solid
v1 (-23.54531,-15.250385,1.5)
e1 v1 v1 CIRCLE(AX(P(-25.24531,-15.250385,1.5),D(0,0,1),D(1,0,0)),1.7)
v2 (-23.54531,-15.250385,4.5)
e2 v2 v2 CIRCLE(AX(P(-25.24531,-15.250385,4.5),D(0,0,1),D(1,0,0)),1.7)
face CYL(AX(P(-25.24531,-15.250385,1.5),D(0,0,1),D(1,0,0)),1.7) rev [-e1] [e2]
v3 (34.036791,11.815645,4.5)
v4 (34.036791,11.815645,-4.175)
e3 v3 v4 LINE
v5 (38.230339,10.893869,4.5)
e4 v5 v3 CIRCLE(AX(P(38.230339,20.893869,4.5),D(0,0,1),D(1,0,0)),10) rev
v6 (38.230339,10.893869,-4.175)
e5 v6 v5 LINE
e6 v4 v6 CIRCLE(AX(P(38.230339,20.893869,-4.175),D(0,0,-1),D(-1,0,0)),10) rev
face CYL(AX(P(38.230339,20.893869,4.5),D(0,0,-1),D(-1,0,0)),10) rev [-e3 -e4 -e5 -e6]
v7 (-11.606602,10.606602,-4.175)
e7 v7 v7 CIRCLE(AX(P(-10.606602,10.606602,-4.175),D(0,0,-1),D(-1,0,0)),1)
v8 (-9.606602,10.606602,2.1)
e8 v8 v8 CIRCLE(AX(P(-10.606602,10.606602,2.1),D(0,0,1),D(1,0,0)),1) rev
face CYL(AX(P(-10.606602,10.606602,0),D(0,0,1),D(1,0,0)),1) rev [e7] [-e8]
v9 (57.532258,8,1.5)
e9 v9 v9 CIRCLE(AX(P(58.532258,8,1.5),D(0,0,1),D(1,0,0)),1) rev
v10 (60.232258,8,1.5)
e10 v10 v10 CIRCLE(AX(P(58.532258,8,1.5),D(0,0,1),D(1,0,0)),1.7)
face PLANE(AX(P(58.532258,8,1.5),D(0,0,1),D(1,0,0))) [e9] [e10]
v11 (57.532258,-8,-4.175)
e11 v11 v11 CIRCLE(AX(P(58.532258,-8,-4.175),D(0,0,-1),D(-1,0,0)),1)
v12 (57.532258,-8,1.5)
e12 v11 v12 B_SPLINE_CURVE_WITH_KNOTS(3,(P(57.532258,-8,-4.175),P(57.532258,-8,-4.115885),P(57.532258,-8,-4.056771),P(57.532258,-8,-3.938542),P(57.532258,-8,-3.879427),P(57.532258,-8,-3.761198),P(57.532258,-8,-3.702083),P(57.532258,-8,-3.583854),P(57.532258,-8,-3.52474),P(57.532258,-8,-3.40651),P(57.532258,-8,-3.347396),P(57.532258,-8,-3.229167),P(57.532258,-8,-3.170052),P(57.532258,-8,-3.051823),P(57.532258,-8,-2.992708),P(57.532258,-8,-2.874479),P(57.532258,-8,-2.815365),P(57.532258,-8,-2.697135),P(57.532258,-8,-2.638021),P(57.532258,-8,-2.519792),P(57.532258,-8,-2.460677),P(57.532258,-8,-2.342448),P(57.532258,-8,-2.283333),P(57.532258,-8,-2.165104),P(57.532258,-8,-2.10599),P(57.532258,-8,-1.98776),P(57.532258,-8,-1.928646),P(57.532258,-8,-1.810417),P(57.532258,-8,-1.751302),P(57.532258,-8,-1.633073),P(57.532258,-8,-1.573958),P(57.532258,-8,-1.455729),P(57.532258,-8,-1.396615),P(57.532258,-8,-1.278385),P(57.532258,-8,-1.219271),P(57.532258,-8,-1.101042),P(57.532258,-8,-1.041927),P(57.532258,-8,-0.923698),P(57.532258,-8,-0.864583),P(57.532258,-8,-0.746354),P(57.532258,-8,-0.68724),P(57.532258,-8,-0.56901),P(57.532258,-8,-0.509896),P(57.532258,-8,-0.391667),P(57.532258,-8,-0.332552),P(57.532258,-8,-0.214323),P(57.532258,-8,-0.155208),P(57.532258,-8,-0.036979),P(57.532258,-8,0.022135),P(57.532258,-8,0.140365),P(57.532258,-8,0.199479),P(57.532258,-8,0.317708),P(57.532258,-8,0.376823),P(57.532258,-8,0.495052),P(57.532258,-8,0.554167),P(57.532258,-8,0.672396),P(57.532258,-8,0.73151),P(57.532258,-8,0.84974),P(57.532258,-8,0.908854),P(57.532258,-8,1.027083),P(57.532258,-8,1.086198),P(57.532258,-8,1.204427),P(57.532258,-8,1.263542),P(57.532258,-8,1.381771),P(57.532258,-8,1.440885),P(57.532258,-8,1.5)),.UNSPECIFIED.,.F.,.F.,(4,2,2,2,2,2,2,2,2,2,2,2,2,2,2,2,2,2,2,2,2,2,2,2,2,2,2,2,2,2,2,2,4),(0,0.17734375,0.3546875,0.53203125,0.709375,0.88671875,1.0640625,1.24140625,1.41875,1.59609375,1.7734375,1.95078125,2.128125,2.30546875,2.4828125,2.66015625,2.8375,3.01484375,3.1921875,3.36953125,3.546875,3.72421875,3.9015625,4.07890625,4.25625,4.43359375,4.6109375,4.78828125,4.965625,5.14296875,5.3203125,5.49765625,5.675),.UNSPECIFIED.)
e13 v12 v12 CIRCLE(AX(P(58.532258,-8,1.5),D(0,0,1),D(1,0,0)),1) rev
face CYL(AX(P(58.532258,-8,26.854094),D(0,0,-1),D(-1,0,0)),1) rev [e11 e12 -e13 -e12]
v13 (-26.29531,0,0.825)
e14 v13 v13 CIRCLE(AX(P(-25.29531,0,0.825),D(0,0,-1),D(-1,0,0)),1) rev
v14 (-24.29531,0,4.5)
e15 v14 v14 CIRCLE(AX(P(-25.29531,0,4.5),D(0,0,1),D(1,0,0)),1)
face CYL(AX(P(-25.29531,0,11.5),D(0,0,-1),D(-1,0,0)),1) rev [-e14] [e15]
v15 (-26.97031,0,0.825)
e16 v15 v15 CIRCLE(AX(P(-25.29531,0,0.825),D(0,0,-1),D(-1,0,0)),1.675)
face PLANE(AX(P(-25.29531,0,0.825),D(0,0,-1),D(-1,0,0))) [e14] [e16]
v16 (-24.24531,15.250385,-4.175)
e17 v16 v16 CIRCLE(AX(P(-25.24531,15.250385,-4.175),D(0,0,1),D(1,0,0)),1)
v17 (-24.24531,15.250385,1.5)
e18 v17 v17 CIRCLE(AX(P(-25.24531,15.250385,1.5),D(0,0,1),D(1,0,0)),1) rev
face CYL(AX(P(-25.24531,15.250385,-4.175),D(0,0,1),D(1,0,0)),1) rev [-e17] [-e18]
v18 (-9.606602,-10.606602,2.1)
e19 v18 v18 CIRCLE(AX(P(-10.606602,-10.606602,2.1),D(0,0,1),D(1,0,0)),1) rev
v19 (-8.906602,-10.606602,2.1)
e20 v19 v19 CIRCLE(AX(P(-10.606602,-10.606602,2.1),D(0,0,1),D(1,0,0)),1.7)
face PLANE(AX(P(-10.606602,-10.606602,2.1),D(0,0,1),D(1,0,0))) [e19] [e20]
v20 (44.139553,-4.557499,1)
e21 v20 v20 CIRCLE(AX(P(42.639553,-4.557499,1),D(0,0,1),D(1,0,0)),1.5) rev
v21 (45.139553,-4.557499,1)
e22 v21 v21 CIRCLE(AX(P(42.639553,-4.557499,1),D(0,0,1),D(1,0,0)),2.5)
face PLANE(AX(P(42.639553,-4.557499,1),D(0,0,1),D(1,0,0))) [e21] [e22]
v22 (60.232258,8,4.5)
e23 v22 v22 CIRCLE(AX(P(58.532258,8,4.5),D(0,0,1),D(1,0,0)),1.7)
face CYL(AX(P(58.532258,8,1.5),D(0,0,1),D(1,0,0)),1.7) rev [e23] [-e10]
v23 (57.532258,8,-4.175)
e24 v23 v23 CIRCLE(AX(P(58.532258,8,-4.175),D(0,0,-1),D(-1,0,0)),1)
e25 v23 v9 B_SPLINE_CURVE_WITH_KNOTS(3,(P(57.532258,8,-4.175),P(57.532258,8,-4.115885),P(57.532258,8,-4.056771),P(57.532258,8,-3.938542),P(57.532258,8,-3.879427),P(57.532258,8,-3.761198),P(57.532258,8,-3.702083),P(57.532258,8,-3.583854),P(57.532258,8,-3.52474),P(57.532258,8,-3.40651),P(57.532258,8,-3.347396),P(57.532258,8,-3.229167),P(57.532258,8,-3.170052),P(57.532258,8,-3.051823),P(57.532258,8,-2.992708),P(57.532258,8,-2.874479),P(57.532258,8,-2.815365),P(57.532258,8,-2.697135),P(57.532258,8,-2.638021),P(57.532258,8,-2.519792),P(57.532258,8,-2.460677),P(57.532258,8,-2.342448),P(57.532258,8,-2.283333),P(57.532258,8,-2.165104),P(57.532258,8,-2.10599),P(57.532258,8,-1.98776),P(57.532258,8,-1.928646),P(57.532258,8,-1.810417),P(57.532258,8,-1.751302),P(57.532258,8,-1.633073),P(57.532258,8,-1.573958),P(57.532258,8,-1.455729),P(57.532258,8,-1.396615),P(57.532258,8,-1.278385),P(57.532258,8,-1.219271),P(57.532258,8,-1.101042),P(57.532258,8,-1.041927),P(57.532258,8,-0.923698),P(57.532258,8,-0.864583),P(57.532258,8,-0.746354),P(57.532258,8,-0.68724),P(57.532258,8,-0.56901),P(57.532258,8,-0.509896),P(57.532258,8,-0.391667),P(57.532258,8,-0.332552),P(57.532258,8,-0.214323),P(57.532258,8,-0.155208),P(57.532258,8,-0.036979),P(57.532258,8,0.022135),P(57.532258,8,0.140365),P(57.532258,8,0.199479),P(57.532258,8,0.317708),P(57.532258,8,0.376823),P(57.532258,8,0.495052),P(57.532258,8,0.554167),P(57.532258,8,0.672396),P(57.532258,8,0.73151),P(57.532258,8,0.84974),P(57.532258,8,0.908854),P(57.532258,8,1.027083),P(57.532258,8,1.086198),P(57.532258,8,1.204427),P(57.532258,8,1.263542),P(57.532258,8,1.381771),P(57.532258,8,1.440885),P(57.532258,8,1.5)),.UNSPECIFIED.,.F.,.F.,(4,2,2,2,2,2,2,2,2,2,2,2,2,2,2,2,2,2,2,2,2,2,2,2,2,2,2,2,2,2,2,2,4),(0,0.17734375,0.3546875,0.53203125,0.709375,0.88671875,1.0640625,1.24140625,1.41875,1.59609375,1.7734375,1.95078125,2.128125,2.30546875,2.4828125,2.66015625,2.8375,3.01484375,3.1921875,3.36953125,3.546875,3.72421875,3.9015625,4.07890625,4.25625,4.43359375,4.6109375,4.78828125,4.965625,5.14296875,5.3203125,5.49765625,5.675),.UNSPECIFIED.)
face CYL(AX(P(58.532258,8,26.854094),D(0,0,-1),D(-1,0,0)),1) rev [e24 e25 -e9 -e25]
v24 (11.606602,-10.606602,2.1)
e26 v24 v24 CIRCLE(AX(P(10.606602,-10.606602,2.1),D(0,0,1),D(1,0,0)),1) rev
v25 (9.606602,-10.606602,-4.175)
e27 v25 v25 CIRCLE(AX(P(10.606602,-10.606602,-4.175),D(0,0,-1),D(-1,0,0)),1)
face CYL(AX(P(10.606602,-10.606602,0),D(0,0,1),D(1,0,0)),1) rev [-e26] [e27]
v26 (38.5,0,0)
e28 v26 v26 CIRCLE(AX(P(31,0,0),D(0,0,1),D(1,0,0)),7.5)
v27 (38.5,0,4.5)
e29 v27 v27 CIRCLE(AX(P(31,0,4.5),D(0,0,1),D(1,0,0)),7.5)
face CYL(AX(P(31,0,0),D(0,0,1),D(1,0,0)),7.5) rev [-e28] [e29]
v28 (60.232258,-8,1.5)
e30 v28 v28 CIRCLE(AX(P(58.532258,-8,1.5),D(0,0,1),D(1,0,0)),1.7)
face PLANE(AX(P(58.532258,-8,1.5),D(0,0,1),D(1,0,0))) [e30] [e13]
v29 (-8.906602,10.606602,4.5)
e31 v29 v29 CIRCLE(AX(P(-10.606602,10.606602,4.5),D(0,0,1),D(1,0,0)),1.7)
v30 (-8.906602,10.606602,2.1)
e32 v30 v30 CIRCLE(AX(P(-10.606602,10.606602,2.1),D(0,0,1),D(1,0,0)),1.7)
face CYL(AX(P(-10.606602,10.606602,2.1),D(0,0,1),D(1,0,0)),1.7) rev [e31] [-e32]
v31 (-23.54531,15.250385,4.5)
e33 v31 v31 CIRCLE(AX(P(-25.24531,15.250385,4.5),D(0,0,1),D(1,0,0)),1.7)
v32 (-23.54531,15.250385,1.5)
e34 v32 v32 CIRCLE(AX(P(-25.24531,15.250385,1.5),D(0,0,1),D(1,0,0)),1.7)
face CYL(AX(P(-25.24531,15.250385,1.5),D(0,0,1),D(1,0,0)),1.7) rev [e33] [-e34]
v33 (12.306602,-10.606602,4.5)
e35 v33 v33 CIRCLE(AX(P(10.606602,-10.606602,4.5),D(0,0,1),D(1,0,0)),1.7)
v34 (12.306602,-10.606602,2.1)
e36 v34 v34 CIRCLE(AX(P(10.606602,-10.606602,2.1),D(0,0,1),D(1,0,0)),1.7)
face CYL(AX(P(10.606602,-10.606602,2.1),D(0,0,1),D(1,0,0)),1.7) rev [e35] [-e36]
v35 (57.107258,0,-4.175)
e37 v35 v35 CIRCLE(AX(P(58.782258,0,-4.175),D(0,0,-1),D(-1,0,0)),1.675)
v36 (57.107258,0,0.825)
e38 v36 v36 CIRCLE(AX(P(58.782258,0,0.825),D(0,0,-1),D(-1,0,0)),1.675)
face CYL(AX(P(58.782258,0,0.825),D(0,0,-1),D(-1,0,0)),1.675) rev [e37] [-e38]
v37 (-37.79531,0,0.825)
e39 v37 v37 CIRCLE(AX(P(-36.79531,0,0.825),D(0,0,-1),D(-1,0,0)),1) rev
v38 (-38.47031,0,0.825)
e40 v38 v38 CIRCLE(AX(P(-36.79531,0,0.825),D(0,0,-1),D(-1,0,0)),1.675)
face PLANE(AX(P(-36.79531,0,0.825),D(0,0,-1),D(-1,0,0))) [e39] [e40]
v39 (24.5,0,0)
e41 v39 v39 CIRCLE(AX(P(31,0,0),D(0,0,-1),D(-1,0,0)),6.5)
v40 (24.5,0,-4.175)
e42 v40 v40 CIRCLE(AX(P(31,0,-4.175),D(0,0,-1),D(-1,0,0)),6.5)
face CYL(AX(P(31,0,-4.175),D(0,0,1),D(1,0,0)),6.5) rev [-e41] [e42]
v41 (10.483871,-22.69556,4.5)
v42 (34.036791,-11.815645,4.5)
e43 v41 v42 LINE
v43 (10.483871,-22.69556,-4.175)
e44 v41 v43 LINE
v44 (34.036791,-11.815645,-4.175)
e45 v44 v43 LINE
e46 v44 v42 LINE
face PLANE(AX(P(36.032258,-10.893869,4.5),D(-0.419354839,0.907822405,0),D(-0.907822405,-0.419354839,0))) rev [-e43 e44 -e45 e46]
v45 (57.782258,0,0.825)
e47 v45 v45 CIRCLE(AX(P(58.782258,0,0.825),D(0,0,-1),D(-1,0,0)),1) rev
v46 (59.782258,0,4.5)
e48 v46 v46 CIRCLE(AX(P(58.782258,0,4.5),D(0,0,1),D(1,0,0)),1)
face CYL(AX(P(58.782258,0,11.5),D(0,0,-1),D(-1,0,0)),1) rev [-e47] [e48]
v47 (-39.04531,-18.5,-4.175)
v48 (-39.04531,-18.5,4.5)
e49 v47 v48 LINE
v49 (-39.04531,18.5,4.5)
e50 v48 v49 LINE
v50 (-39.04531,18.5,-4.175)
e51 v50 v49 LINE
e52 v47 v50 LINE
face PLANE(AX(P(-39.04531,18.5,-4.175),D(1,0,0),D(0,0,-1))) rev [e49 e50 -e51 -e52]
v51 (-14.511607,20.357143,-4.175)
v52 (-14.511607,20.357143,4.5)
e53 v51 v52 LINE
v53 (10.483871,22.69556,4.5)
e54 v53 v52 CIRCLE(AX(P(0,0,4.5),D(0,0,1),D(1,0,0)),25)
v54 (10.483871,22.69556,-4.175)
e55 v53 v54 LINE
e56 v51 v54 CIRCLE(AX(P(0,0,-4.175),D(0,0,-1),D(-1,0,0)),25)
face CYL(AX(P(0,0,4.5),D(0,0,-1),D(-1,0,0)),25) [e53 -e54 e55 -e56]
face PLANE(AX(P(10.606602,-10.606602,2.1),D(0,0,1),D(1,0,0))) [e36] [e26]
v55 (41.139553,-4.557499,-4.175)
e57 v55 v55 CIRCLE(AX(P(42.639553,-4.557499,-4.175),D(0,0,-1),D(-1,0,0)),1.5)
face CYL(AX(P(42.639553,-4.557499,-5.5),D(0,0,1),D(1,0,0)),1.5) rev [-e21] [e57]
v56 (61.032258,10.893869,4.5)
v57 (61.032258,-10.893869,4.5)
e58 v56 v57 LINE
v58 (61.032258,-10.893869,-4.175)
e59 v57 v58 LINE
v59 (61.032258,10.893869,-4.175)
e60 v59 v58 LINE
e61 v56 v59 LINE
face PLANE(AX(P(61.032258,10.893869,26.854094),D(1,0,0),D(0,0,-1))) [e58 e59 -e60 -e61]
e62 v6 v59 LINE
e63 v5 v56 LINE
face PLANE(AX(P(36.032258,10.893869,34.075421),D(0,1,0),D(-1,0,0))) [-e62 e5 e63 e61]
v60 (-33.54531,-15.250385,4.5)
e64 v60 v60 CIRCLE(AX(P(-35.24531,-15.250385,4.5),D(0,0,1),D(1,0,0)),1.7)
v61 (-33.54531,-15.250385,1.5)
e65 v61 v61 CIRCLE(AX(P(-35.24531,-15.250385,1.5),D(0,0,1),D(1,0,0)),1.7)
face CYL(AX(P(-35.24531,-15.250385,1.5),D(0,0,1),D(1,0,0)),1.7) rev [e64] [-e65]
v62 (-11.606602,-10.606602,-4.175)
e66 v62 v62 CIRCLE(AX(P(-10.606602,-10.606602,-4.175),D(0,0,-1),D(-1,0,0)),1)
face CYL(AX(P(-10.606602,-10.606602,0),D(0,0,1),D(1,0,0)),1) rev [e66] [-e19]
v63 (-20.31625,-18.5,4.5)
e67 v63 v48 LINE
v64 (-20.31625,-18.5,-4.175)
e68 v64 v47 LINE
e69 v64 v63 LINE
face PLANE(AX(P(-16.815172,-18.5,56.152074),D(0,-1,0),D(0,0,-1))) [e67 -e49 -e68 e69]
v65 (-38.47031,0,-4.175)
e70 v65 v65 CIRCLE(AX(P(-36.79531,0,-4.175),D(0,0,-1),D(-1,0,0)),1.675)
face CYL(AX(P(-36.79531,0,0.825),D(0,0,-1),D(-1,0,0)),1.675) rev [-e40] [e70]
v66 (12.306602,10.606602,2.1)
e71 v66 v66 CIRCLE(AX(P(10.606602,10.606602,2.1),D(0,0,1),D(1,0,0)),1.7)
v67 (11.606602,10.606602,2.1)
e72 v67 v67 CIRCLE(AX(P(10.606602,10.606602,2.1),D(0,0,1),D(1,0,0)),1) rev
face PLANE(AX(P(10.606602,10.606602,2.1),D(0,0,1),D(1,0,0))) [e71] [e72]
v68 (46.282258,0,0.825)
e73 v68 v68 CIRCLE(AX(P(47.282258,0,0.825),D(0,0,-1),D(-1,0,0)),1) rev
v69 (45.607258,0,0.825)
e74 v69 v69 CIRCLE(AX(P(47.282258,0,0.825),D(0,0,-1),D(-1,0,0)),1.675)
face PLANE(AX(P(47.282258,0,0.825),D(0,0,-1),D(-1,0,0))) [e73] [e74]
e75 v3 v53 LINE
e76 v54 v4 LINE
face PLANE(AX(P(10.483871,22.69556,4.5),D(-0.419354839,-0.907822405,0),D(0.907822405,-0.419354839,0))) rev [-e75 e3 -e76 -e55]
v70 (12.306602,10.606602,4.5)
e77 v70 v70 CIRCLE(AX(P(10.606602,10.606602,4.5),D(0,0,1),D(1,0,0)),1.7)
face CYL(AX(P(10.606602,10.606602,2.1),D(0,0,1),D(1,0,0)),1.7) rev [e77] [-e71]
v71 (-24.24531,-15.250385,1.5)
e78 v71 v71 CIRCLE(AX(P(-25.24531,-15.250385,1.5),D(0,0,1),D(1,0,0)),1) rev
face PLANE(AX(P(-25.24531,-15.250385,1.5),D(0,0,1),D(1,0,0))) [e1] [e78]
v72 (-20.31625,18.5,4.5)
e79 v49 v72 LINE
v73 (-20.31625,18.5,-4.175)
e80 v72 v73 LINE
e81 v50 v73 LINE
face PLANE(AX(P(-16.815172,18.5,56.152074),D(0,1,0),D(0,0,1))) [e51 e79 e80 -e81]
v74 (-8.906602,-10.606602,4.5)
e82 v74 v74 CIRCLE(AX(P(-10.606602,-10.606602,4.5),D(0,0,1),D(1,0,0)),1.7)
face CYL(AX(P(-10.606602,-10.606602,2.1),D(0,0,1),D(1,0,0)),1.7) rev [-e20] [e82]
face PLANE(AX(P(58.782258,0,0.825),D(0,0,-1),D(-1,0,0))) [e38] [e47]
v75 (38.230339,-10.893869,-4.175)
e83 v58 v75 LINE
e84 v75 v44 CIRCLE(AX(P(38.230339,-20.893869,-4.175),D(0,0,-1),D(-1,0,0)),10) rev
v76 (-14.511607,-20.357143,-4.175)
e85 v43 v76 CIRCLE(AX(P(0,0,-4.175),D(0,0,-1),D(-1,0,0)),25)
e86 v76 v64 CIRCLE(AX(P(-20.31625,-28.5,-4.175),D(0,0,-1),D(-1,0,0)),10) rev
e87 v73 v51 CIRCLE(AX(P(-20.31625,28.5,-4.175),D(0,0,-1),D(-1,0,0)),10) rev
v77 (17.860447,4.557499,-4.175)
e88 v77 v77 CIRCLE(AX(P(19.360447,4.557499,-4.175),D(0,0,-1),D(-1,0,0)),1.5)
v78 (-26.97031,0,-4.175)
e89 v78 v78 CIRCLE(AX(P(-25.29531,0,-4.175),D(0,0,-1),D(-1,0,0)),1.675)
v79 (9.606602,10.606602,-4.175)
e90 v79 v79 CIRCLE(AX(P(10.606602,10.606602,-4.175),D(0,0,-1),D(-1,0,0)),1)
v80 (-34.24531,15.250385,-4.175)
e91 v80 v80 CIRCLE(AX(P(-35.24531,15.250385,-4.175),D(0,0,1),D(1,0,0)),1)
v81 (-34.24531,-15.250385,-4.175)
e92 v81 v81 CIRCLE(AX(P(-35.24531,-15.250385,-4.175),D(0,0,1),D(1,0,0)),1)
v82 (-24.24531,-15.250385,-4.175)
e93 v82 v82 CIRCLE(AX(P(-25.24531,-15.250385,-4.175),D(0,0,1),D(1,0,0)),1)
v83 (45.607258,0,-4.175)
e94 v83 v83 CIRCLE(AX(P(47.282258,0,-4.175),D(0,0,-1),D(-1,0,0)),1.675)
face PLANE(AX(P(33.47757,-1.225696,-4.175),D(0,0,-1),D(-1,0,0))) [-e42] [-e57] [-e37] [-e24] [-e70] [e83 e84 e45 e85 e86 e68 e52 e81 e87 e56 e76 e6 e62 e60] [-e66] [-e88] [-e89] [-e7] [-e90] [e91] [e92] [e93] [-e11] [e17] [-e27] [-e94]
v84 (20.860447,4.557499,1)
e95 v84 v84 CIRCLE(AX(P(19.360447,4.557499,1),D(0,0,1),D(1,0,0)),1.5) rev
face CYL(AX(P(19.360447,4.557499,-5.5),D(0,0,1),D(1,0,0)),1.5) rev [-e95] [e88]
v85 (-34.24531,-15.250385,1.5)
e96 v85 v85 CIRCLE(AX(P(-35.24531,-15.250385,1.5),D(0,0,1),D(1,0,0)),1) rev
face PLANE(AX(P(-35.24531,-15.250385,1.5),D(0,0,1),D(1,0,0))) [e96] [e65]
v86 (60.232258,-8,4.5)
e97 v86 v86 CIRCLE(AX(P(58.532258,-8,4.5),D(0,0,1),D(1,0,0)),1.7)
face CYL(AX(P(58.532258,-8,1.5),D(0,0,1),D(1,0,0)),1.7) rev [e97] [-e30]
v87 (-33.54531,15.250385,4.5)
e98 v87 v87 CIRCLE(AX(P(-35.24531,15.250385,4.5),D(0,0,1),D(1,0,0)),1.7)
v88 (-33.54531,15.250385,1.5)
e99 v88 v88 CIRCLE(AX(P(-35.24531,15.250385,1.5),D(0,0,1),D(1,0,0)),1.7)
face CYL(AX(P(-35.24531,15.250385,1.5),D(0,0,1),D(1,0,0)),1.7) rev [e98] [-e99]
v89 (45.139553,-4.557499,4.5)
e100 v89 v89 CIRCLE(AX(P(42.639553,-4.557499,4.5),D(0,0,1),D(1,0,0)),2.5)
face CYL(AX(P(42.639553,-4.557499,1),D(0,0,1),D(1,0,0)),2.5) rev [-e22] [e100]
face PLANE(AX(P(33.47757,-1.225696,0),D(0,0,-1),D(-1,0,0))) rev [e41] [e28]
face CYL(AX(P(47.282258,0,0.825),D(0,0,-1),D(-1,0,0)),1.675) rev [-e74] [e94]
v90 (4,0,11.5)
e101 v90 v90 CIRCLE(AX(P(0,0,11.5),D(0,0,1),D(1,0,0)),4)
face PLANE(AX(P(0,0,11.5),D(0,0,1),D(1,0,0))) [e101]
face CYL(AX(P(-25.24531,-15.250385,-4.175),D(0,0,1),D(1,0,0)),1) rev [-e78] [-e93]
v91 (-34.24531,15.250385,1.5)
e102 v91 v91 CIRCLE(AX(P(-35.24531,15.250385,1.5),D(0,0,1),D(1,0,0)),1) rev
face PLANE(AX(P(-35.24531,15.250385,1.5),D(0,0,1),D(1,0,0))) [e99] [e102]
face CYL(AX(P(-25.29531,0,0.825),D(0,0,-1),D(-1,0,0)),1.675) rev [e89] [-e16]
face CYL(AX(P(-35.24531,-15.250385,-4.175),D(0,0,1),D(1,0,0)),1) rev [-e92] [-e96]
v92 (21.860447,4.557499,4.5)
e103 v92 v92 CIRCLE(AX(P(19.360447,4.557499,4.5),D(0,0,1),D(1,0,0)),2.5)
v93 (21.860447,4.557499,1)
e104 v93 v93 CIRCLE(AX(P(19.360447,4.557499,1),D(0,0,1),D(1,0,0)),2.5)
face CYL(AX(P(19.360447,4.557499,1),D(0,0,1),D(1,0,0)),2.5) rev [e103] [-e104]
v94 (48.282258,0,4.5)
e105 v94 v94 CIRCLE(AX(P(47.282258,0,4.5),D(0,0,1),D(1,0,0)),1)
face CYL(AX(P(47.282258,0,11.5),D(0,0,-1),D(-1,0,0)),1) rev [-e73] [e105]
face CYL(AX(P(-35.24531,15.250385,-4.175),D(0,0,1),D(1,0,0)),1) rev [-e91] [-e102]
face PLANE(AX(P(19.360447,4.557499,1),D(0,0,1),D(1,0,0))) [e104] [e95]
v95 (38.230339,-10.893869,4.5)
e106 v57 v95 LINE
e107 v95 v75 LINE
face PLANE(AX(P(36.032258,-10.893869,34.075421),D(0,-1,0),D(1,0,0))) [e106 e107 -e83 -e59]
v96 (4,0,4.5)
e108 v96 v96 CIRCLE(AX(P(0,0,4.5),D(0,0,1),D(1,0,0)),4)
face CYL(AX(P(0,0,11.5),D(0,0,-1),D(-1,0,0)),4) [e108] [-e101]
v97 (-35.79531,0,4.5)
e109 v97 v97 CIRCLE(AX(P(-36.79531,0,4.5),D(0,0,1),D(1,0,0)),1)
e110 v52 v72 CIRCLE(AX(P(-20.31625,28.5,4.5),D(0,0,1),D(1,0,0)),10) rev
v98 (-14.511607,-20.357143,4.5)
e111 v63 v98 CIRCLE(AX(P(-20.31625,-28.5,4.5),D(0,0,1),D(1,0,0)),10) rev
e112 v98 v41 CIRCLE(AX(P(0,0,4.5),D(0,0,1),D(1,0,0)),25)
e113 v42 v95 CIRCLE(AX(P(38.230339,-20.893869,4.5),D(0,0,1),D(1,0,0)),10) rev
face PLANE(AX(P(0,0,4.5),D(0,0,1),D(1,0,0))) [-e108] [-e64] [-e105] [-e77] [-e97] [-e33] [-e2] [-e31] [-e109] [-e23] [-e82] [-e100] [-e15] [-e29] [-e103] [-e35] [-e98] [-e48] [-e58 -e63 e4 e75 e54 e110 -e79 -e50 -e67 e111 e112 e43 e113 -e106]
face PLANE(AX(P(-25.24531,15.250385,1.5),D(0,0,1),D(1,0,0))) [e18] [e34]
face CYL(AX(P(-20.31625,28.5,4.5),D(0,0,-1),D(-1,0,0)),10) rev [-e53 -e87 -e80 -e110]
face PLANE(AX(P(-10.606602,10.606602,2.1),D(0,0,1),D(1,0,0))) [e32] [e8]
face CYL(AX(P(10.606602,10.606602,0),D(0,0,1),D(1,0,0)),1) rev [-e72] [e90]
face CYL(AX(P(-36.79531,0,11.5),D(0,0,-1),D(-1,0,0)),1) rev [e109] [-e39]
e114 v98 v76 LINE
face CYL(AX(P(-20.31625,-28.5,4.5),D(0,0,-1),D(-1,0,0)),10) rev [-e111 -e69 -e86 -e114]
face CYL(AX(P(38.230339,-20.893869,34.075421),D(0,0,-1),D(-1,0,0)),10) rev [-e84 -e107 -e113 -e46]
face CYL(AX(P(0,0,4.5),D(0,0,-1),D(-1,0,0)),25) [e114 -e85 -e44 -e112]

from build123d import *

# Parameters (mm, degrees)
BOSS_EXTRUDE1_DEPTH  = 4.5
SKETCH2_R            = 7.5
CUT_EXTRUDE1_DEPTH   = 50.942466899
SKETCH3_R            = 4
BOSS_EXTRUDE2_DEPTH  = 7
BOSS_EXTRUDE3_DEPTH  = 4.5
FILLET1_R            = 10
CUT_EXTRUDE4_DEPTH   = 62.754464971
SKETCH9_R            = 1
CUT_EXTRUDE5_DEPTH   = 62.182594482
SKETCH10_R           = 1.7
CUT_EXTRUDE6_DEPTH   = 2.4
CUT_EXTRUDE7_DEPTH   = 4.5
FILLET2_R            = 10
CUT_EXTRUDE8_DEPTH   = 51.658168147
SKETCH23_R           = 1
SKETCH23_R_2         = 6.5
BOSS_EXTRUDE6_DEPTH  = 4.175
BOSS_EXTRUDE7_START  = -8.675
BOSS_EXTRUDE7_DEPTH  = 8.675
SKETCH26_W           = 9
SKETCH26_H           = 21.787737724
BOSS_EXTRUDE8_DEPTH  = 33
CUT_EXTRUDE9_REACH   = 94.723
SKETCH27_R           = 5
BOSS_EXTRUDE9_DEPTH  = 8.675
BOSS_EXTRUDE10_DEPTH = 105
FILLET4_R            = 10
CUT_EXTRUDE10_DEPTH  = 9
SKETCH31_W           = 12
SKETCH31_H           = 25
CUT_EXTRUDE11_DEPTH  = 122.612556686
BOSS_EXTRUDE11_DEPTH = 10
CUT_EXTRUDE12_REACH  = 142.02
SKETCH33_W           = 10
SKETCH33_H           = 33
CUT_EXTRUDE13_REACH  = 157.049
SKETCH34_W           = 105
SKETCH34_H           = 35
SKETCH37_W           = 2
SKETCH37_H           = 21.787737724
CUT_EXTRUDE16_DEPTH  = 33
SKETCH38_R           = 1.5
CUT_EXTRUDE17_DEPTH  = 10
SKETCH39_R           = 2.5
CUT_EXTRUDE18_DEPTH  = 3.5
SKETCH40_W           = 25.280034453
SKETCH40_H           = 37
CUT_EXTRUDE19_DEPTH  = 133.5
SKETCH41_W           = 12
SKETCH41_H           = 25
BOSS_EXTRUDE12_DEPTH = 8.675
SKETCH42_W           = 13.810626618
SKETCH42_H           = 37
CUT_EXTRUDE20_DEPTH  = 70.667883159
SKETCH43_R           = 1
CUT_EXTRUDE21_DEPTH  = 70.667883159
SKETCH44_R           = 1.7
CUT_EXTRUDE22_DEPTH  = 3
SKETCH45_W           = 5
SKETCH45_H           = 21.787737724
SKETCH45_R           = 1
BOSS_EXTRUDE13_DEPTH = 8.675
SKETCH46_R           = 1.7
CUT_EXTRUDE23_DEPTH  = 3
FILLET5_R            = 1
SKETCH47_W           = 49.44871548
SKETCH47_H           = 46.533616532
CUT_EXTRUDE25_DEPTH  = 33
SKETCH51_R           = 1
CUT_EXTRUDE26_DEPTH  = 68.791165845
SKETCH52_R           = 1.675
CUT_EXTRUDE27_DEPTH  = 5


with BuildPart() as part:
    # Sketch1 → Boss-Extrude1 (new body)
    with BuildSketch(Plane.XY):
        with BuildLine():
            Line((10.483870968, 22.695560128), (36.032258065, 10.893868862))
            ThreePointArc((36.032258065, 10.893868862), (43, 0), (36.032258065, -10.893868862))
            Line((36.032258065, -10.893868862), (10.483870968, -22.695560128))
            ThreePointArc((10.483870968, -22.695560128), (-25, 0), (10.483870968, 22.695560128))
        make_face()
    extrude(amount=BOSS_EXTRUDE1_DEPTH)

    # Sketch2 → Cut-Extrude1 (cut, through all)
    with BuildSketch(Plane.XY.offset(4.5)):
        with Locations((31, 0)):
            Circle(SKETCH2_R)
    extrude(amount=-CUT_EXTRUDE1_DEPTH, mode=Mode.SUBTRACT)

    # Sketch3 → Boss-Extrude2 (add)
    with BuildSketch(Plane.XY.offset(4.5)):
        Circle(SKETCH3_R)
    extrude(amount=BOSS_EXTRUDE2_DEPTH)

    # Sketch4 → Boss-Extrude3 (add)
    with BuildSketch(Plane(origin=(0, 0, 0), x_dir=(-1, 0, 0), z_dir=(0, 0, -1))):
        with BuildLine():
            Line((-36.032258065, 10.893868862), (-56.032258065, 10.893868862))
            Line((-56.032258065, 10.893868862), (-56.032258065, -10.893868862))
            Line((-56.032258065, -10.893868862), (-36.032258065, -10.893868862))
            ThreePointArc((-36.032258065, -10.893868862), (-43, 0), (-36.032258065, 10.893868862))
        make_face()
        with BuildLine():
            Line((22.501635968, 10.893868862), (42.501635968, 10.893868862))
            Line((42.501635968, 10.893868862), (42.501635968, -10.893868862))
            Line((42.501635968, -10.893868862), (22.501635968, -10.893868862))
            ThreePointArc((22.501635968, -10.893868862), (25, 0), (22.501635968, 10.893868862))
        make_face()
    extrude(amount=-BOSS_EXTRUDE3_DEPTH)

    # Fillet1
    fillet1_edges = [part.edges().sort_by_distance(p)[0] for p in [
        (56.032258065, 10.893868862, 2.25),
        (56.032258065, -10.893868862, 2.25),
        (-42.501635968, -10.893868862, 2.25),
        (-42.501635968, 10.893868862, 2.25),
    ]]
    fillet(fillet1_edges, radius=FILLET1_R)

    # Sketch8 → Cut-Extrude4 (cut, through all)
    with BuildSketch(Plane.XY.offset(4.5)):
        with BuildLine():
            Line((56.032258065, 0.893868862), (56.032258065, -0.893868862))
            ThreePointArc((56.032258065, -0.893868862), (55.873267798, -2.669967796), (55.401352579, -4.389590243))
            Line((55.401352579, -4.389590243), (55.401352579, 4.389590243))
            ThreePointArc((55.401352579, 4.389590243), (55.873267798, 2.669967796), (56.032258065, 0.893868862))
        make_face()
        with BuildLine():
            Line((-42.501635968, -0.893868862), (-42.501635968, 0.893868862))
            ThreePointArc((-42.501635968, 0.893868862), (-42.342645701, 2.669967796), (-41.870730482, 4.389590243))
            Line((-41.870730482, 4.389590243), (-41.870730482, -4.389590243))
            ThreePointArc((-41.870730482, -4.389590243), (-42.342645701, -2.669967796), (-42.501635968, -0.893868862))
        make_face()
    extrude(amount=-CUT_EXTRUDE4_DEPTH, mode=Mode.SUBTRACT)

    # Sketch9 → Cut-Extrude5 (cut, through all)
    with BuildSketch(Plane.XY.offset(4.5)):
        with Locations((-10.606601718, 10.606601718)):
            Circle(SKETCH9_R)
        with Locations((10.606601718, 10.606601718)):
            Circle(SKETCH9_R)
        with Locations((10.606601718, -10.606601718)):
            Circle(SKETCH9_R)
        with Locations((-10.606601718, -10.606601718)):
            Circle(SKETCH9_R)
    extrude(amount=-CUT_EXTRUDE5_DEPTH, mode=Mode.SUBTRACT)

    # Sketch10 → Cut-Extrude6 (cut)
    with BuildSketch(Plane.XY.offset(4.5)):
        with Locations((-10.606601718, 10.606601718)):
            Circle(SKETCH10_R)
        with Locations((10.606601718, 10.606601718)):
            Circle(SKETCH10_R)
        with Locations((10.606601718, -10.606601718)):
            Circle(SKETCH10_R)
        with Locations((-10.606601718, -10.606601718)):
            Circle(SKETCH10_R)
    extrude(amount=-CUT_EXTRUDE6_DEPTH, mode=Mode.SUBTRACT)

    # Sketch11 → Cut-Extrude7 (cut)
    with BuildSketch(Plane(origin=(0, 0, 0), x_dir=(-1, 0, 0), z_dir=(0, 0, -1))):
        with BuildLine():
            Line((-40.960235838, 14.646128502), (-73.67178465, 18.9155259))
            Line((-73.67178465, 18.9155259), (-68.640309048, -15.675868866))
            Line((-68.640309048, -15.675868866), (-41.444996676, -13.212200821))
            ThreePointArc((-41.444996676, -13.212200821), (-43.493415761, 0.756825882), (-40.960235838, 14.646128502))
        make_face()
    extrude(amount=-CUT_EXTRUDE7_DEPTH, mode=Mode.SUBTRACT)

    # Fillet2
    # the kernel refuses this fillet: 10 mm, written as the material it takes off along each edge
    with BuildSketch(Plane(origin=(42.113817462, -10.893868862, 28.001897109), x_dir=(0.1443560651040101, 0.9895258088941827, 0), z_dir=(0, 0, -1))) as fillet2_piece_1:
        with BuildLine():
            CenterArc((8.32021185, -9.941449502), FILLET2_R, 83.796810377, 73.10182949)
            Line((-0.877909984, -6.017859982), (-1.061872421, -5.939388192))
            ThreePointArc((-1.061872421, -5.939388192), (-0.636860154, -2.980058778), (-0.197905162, 0.028871213))
            Line((-0.197905162, 0.028871213), (-0.02161094, 0.19882899))
            ThreePointArc((-0.02161094, 0.19882899), (4.700379422, 0.454694668), (9.422369784, 0.19882899))
            Line((9.422369784, 0.19882899), (9.400758844, 0))
        make_face()
    extrude(amount=51.503794219, mode=Mode.SUBTRACT)
    with BuildSketch(Plane(origin=(42.113817462, 10.893868862, 28.001897109), x_dir=(-1, 0, 0), z_dir=(0, 0, -1))) as fillet2_piece_2:
        with BuildLine():
            CenterArc((8.636247816, -9.668172893), FILLET2_R, 104.801368002, 73.10182949)
            Line((-1.357056556, -9.302293499), (-1.556922643, -9.294975911))
            ThreePointArc((-1.556922643, -9.294975911), (-1.128460387, -4.585508816), (-0.193626747, 0.050086753))
            Line((-0.193626747, 0.050086753), (0, 0.2))
            ThreePointArc((0, 0.2), (3.040779699, 0.2), (6.030465629, 0.193363458))
            Line((6.030465629, 0.193363458), (6.081559398, 0))
        make_face()
    extrude(amount=51.503794219, mode=Mode.SUBTRACT)

    # Sketch12 → Cut-Extrude8 (cut, through all)
    with BuildSketch(Plane.XY.offset(4.5)):
        with BuildLine():
            Line((-22.501635968, 10.893868862), (-42.592674389, 14.819498464))
            Line((-42.592674389, 14.819498464), (-48.148078041, -13.612584929))
            Line((-48.148078041, -13.612584929), (-27.427309778, -14.315310761))
            Line((-27.427309778, -14.315310761), (-22.501635968, -10.893868862))
            ThreePointArc((-22.501635968, -10.893868862), (-25, 0), (-22.501635968, 10.893868862))
        make_face()
    extrude(amount=-CUT_EXTRUDE8_DEPTH, mode=Mode.SUBTRACT)

    # Sketch23 → Boss-Extrude6 (add)
    with BuildSketch(Plane(origin=(0, 0, 0), x_dir=(-1, 0, 0), z_dir=(0, 0, -1))):
        with BuildLine():
            Line((-36.032258065, -10.893868862), (-10.483870968, -22.695560128))
            ThreePointArc((-10.483870968, -22.695560128), (25, 0), (-10.483870968, 22.695560128))
            Line((-10.483870968, 22.695560128), (-36.032258065, 10.893868862))
            ThreePointArc((-36.032258065, 10.893868862), (-41.287575846, 7.470998455), (-43.470874018, 1.591575362))
            ThreePointArc((-43.470874018, 1.591575362), (-43.5, 0), (-43.470874018, -1.591575362))
            ThreePointArc((-43.470874018, -1.591575362), (-41.287575846, -7.470998455), (-36.032258065, -10.893868862))
        make_face()
        with Locations(Location((-10.606601718, -10.606601718, 0), (0, 0, 180))):
            Circle(SKETCH23_R, mode=Mode.SUBTRACT)
        with Locations(Location((10.606601718, -10.606601718, 0), (0, 0, 180))):
            Circle(SKETCH23_R, mode=Mode.SUBTRACT)
        with Locations(Location((10.606601718, 10.606601718, 0), (0, 0, 180))):
            Circle(SKETCH23_R, mode=Mode.SUBTRACT)
        with Locations(Location((-10.606601718, 10.606601718, 0), (0, 0, 180))):
            Circle(SKETCH23_R, mode=Mode.SUBTRACT)
        with Locations((-31, 0)):
            Circle(SKETCH23_R_2, mode=Mode.SUBTRACT)
    extrude(amount=BOSS_EXTRUDE6_DEPTH)

    # Sketch25 → Boss-Extrude7 (add)
    with BuildSketch(Plane(origin=(0, 0, -4.175), x_dir=(-1, 0, 0), z_dir=(0, 0, -1)).offset(BOSS_EXTRUDE7_START)):
        with BuildLine():
            Line((-36.032258065, 10.893868862), (-56.032258065, 10.893868862))
            Line((-56.032258065, 10.893868862), (-56.032258065, -10.893868862))
            Line((-56.032258065, -10.893868862), (-36.032258065, -10.893868862))
            ThreePointArc((-36.032258065, -10.893868862), (-41.287575846, -7.470998455), (-43.470874018, -1.591575362))
            ThreePointArc((-43.470874018, -1.591575362), (-43.5, 0), (-43.470874018, 1.591575362))
            ThreePointArc((-43.470874018, 1.591575362), (-41.287575846, 7.470998455), (-36.032258065, 10.893868862))
        make_face()
    extrude(amount=BOSS_EXTRUDE7_DEPTH)

    # Sketch26 → Boss-Extrude8 (add)
    with BuildSketch(Plane.XY.offset(4.5)):
        with Locations((51.532258065, 0)):
            Rectangle(SKETCH26_W, SKETCH26_H)
    extrude(amount=BOSS_EXTRUDE8_DEPTH)

    # Sketch27 → Cut-Extrude9 (cut, up to next)
    with BuildSketch(Plane(origin=(56.032258065, 0, 0), x_dir=(0, 0, -1), z_dir=(1, 0, 0)), mode=Mode.PRIVATE) as cut_extrude9_sk1:
        with Locations((-29.5, 0)):
            Circle(SKETCH27_R)
    cut_extrude9_tool1 = extrude(cut_extrude9_sk1.sketch, amount=-CUT_EXTRUDE9_REACH, mode=Mode.PRIVATE) & part.part
    add(cut_extrude9_tool1.solids().sort_by_distance((56.032258, 0, 29.5))[0], mode=Mode.SUBTRACT)

    # Sketch28 → Boss-Extrude9 (add)
    with BuildSketch(Plane(origin=(0, 0, -4.175), x_dir=(-1, 0, 0), z_dir=(0, 0, -1))):
        with BuildLine():
            Line((16.815171721, 18.5), (52.85593628, 18.5))
            Line((52.85593628, 18.5), (52.85593628, -18.5))
            Line((52.85593628, -18.5), (16.815171721, -18.5))
            ThreePointArc((16.815171721, -18.5), (25, 0), (16.815171721, 18.5))
        make_face()
    extrude(amount=-BOSS_EXTRUDE9_DEPTH)

    # Sketch29 → Boss-Extrude10 (add)
    with BuildSketch(Plane.XY.offset(4.5)):
        Polygon((-52.85593628, 18.5), (-34.835554, 18.5), (-34.835554, 16.5), (-50.85593628, 16.5), (-50.85593628, -16.5), (-34.835554, -16.5), (-34.835554, -18.5), (-52.85593628, -18.5), align=None)
    extrude(amount=BOSS_EXTRUDE10_DEPTH)

    # Fillet4
    fillet4_edges = [part.edges().sort_by_distance(p)[0] for p in [
        (-16.815171721, 18.5, 0.1625),
        (-16.815171721, -18.5, 0.1625),
        (36.032258065, 10.893868862, 0.1625),
        (36.032258065, -10.893868862, 0.1625),
    ]]
    fillet(fillet4_edges, radius=FILLET4_R)

    # Sketch30 → Cut-Extrude10 (cut)
    with BuildSketch(Plane(origin=(56.032258065, 0, 0), x_dir=(0, 0, -1), z_dir=(1, 0, 0))):
        with BuildLine():
            Line((-34.192833193, 1.725490257), (-34.827272241, 0))
            Line((-34.827272241, 0), (-34.192833193, -1.725490257))
            ThreePointArc((-34.192833193, -1.725490257), (-34.5, 0), (-34.192833193, 1.725490257))
        make_face()
    extrude(amount=-CUT_EXTRUDE10_DEPTH, mode=Mode.SUBTRACT)

    # Sketch31 → Cut-Extrude11 (cut, through all)
    with BuildSketch(Plane.XY.offset(4.5)):
        with Locations((-42.794383467, 0)):
            Rectangle(SKETCH31_W, SKETCH31_H)
    extrude(amount=-CUT_EXTRUDE11_DEPTH, mode=Mode.SUBTRACT)

    # Sketch32 → Boss-Extrude11 (add)
    with BuildSketch(Plane.XY.offset(4.5)):
        Polygon((-34.835554, 18.5), (-34.835554, 16.5), (-27.732139714, 16.5), (-27.732139714, -16.5), (-34.835554, -16.5), (-34.835554, -18.5), (-27.575901827, -18.5), (-27.575901827, 18.5), align=None)
    extrude(amount=BOSS_EXTRUDE11_DEPTH)

    # Sketch33 → Cut-Extrude12 (cut, up to next)
    with BuildSketch(Plane(origin=(-27.575901827, 0, 0), x_dir=(0, 0, -1), z_dir=(1, 0, 0)), mode=Mode.PRIVATE) as cut_extrude12_sk1:
        with Locations((-9.5, 0)):
            Rectangle(SKETCH33_W, SKETCH33_H)
    cut_extrude12_tool1 = extrude(cut_extrude12_sk1.sketch, amount=-CUT_EXTRUDE12_REACH, mode=Mode.PRIVATE) & part.part
    add(cut_extrude12_tool1.solids().sort_by_distance((-27.575902, 0, 9.5))[0], mode=Mode.SUBTRACT)

    # Cut-Extrude13: up to this face of the body (flat: up to its plane)
    cut_extrude13_end = Plane(part.part.faces().sort_by_distance((-27.575901827, -17.5, 9.5))[0])
    # Sketch34 → Cut-Extrude13 (cut, up to the picked face)
    with BuildSketch(Plane(origin=(-50.85593628, 0, 0), x_dir=(0, 0, -1), z_dir=(1, 0, 0)), mode=Mode.PRIVATE) as cut_extrude13_sk1:
        with Locations((-57, 0)):
            Rectangle(SKETCH34_W, SKETCH34_H)
    cut_extrude13_tool1 = split(extrude(cut_extrude13_sk1.sketch, amount=CUT_EXTRUDE13_REACH, mode=Mode.PRIVATE), bisect_by=cut_extrude13_end, keep=Keep.BOTH, mode=Mode.PRIVATE)
    add(cut_extrude13_tool1.solids().sort_by(Axis((-50.855936, 0, 57), (1, 0, 0)))[0], mode=Mode.SUBTRACT)

    # Sketch37 → Cut-Extrude16 (cut)
    with BuildSketch(Plane.XY.offset(37.5)):
        with Locations((48.032258065, 0)):
            Rectangle(SKETCH37_W, SKETCH37_H)
    extrude(amount=-CUT_EXTRUDE16_DEPTH, mode=Mode.SUBTRACT)

    # Sketch38 → Cut-Extrude17 (cut)
    with BuildSketch(Plane.XY.offset(4.5)):
        with Locations((19.360446706, 4.557499217)):
            Circle(SKETCH38_R)
        with Locations((42.639553294, -4.557499217)):
            Circle(SKETCH38_R)
    extrude(amount=-CUT_EXTRUDE17_DEPTH, mode=Mode.SUBTRACT)

    # Sketch39 → Cut-Extrude18 (cut)
    with BuildSketch(Plane.XY.offset(4.5)):
        with Locations((19.360446706, 4.557499217)):
            Circle(SKETCH39_R)
        with Locations((42.639553294, -4.557499217)):
            Circle(SKETCH39_R)
    extrude(amount=-CUT_EXTRUDE18_DEPTH, mode=Mode.SUBTRACT)

    # Sketch40 → Cut-Extrude19 (cut)
    with BuildSketch(Plane.XY.offset(4.5)):
        with Locations((-40.215919054, 0)):
            Rectangle(SKETCH40_W, SKETCH40_H)
    extrude(amount=CUT_EXTRUDE19_DEPTH, mode=Mode.SUBTRACT)

    # Sketch41 → Boss-Extrude12 (add)
    with BuildSketch(Plane.XY.offset(4.5)):
        with Locations((-42.794383467, 0)):
            Rectangle(SKETCH41_W, SKETCH41_H)
    extrude(amount=-BOSS_EXTRUDE12_DEPTH)

    # Sketch42 → Cut-Extrude20 (cut, through all)
    with BuildSketch(Plane.XY.offset(4.5)):
        with Locations((-45.950622971, 0)):
            Rectangle(SKETCH42_W, SKETCH42_H)
    extrude(amount=-CUT_EXTRUDE20_DEPTH, mode=Mode.SUBTRACT)

    # Sketch43 → Cut-Extrude21 (cut, through all)
    with BuildSketch(Plane.XY.offset(4.5)):
        with Locations((-35.245309662, 15.250384638)):
            Circle(SKETCH43_R)
        with Locations((-35.245309662, -15.250384638)):
            Circle(SKETCH43_R)
        with Locations((-25.245309662, 15.250384638)):
            Circle(SKETCH43_R)
        with Locations((-25.245309662, -15.250384638)):
            Circle(SKETCH43_R)
    extrude(amount=-CUT_EXTRUDE21_DEPTH, mode=Mode.SUBTRACT)

    # Sketch44 → Cut-Extrude22 (cut)
    with BuildSketch(Plane.XY.offset(4.5)):
        with Locations((-35.245309662, 15.250384638)):
            Circle(SKETCH44_R)
        with Locations((-25.245309662, 15.250384638)):
            Circle(SKETCH44_R)
        with Locations((-35.245309662, -15.250384638)):
            Circle(SKETCH44_R)
        with Locations((-25.245309662, -15.250384638)):
            Circle(SKETCH44_R)
    extrude(amount=-CUT_EXTRUDE22_DEPTH, mode=Mode.SUBTRACT)

    # Sketch45 → Boss-Extrude13 (add)
    with BuildSketch(Plane(origin=(0, 0, -4.175), x_dir=(-1, 0, 0), z_dir=(0, 0, -1))):
        with Locations((-58.532258065, 0)):
            Rectangle(SKETCH45_W, SKETCH45_H)
        with Locations((-58.532258065, 8)):
            Circle(SKETCH45_R, mode=Mode.SUBTRACT)
        with Locations((-58.532258065, -8)):
            Circle(SKETCH45_R, mode=Mode.SUBTRACT)
    extrude(amount=-BOSS_EXTRUDE13_DEPTH)

    # Sketch46 → Cut-Extrude23 (cut)
    with BuildSketch(Plane.XY.offset(4.5)):
        with Locations((58.532258065, 8)):
            Circle(SKETCH46_R)
        with Locations((58.532258065, -8)):
            Circle(SKETCH46_R)
    extrude(amount=-CUT_EXTRUDE23_DEPTH, mode=Mode.SUBTRACT)

    # Fillet5
    fillet5_edges = [part.edges().sort_by_distance(p)[0] for p in [
        (49.032258065, 0, 4.5),
        (56.032258065, 0, 4.5),
    ]]
    fillet(fillet5_edges, radius=FILLET5_R)

    # Sketch47 → Cut-Extrude25 (cut)
    with BuildSketch(Plane.XY.offset(4.5)):
        with Locations((53.208425627, 0)):
            Rectangle(SKETCH47_W, SKETCH47_H)
    extrude(amount=CUT_EXTRUDE25_DEPTH, mode=Mode.SUBTRACT)

    # Sketch51 → Cut-Extrude26 (cut, through all)
    with BuildSketch(Plane(origin=(0, 0, -4.175), x_dir=(-1, 0, 0), z_dir=(0, 0, -1))):
        with Locations((36.795309662, 0)):
            Circle(SKETCH51_R)
        with Locations((25.295309662, 0)):
            Circle(SKETCH51_R)
        with Locations((-58.782258065, 0)):
            Circle(SKETCH51_R)
        with Locations((-47.282258065, 0)):
            Circle(SKETCH51_R)
    extrude(amount=-CUT_EXTRUDE26_DEPTH, mode=Mode.SUBTRACT)

    # Sketch52 → Cut-Extrude27 (cut)
    with BuildSketch(Plane(origin=(0, 0, -4.175), x_dir=(-1, 0, 0), z_dir=(0, 0, -1))):
        with Locations((36.795309662, 0)):
            Circle(SKETCH52_R)
        with Locations((25.295309662, 0)):
            Circle(SKETCH52_R)
        with Locations((-47.282258065, 0)):
            Circle(SKETCH52_R)
        with Locations((-58.782258065, 0)):
            Circle(SKETCH52_R)
    extrude(amount=-CUT_EXTRUDE27_DEPTH, mode=Mode.SUBTRACT)


solid = part.part
